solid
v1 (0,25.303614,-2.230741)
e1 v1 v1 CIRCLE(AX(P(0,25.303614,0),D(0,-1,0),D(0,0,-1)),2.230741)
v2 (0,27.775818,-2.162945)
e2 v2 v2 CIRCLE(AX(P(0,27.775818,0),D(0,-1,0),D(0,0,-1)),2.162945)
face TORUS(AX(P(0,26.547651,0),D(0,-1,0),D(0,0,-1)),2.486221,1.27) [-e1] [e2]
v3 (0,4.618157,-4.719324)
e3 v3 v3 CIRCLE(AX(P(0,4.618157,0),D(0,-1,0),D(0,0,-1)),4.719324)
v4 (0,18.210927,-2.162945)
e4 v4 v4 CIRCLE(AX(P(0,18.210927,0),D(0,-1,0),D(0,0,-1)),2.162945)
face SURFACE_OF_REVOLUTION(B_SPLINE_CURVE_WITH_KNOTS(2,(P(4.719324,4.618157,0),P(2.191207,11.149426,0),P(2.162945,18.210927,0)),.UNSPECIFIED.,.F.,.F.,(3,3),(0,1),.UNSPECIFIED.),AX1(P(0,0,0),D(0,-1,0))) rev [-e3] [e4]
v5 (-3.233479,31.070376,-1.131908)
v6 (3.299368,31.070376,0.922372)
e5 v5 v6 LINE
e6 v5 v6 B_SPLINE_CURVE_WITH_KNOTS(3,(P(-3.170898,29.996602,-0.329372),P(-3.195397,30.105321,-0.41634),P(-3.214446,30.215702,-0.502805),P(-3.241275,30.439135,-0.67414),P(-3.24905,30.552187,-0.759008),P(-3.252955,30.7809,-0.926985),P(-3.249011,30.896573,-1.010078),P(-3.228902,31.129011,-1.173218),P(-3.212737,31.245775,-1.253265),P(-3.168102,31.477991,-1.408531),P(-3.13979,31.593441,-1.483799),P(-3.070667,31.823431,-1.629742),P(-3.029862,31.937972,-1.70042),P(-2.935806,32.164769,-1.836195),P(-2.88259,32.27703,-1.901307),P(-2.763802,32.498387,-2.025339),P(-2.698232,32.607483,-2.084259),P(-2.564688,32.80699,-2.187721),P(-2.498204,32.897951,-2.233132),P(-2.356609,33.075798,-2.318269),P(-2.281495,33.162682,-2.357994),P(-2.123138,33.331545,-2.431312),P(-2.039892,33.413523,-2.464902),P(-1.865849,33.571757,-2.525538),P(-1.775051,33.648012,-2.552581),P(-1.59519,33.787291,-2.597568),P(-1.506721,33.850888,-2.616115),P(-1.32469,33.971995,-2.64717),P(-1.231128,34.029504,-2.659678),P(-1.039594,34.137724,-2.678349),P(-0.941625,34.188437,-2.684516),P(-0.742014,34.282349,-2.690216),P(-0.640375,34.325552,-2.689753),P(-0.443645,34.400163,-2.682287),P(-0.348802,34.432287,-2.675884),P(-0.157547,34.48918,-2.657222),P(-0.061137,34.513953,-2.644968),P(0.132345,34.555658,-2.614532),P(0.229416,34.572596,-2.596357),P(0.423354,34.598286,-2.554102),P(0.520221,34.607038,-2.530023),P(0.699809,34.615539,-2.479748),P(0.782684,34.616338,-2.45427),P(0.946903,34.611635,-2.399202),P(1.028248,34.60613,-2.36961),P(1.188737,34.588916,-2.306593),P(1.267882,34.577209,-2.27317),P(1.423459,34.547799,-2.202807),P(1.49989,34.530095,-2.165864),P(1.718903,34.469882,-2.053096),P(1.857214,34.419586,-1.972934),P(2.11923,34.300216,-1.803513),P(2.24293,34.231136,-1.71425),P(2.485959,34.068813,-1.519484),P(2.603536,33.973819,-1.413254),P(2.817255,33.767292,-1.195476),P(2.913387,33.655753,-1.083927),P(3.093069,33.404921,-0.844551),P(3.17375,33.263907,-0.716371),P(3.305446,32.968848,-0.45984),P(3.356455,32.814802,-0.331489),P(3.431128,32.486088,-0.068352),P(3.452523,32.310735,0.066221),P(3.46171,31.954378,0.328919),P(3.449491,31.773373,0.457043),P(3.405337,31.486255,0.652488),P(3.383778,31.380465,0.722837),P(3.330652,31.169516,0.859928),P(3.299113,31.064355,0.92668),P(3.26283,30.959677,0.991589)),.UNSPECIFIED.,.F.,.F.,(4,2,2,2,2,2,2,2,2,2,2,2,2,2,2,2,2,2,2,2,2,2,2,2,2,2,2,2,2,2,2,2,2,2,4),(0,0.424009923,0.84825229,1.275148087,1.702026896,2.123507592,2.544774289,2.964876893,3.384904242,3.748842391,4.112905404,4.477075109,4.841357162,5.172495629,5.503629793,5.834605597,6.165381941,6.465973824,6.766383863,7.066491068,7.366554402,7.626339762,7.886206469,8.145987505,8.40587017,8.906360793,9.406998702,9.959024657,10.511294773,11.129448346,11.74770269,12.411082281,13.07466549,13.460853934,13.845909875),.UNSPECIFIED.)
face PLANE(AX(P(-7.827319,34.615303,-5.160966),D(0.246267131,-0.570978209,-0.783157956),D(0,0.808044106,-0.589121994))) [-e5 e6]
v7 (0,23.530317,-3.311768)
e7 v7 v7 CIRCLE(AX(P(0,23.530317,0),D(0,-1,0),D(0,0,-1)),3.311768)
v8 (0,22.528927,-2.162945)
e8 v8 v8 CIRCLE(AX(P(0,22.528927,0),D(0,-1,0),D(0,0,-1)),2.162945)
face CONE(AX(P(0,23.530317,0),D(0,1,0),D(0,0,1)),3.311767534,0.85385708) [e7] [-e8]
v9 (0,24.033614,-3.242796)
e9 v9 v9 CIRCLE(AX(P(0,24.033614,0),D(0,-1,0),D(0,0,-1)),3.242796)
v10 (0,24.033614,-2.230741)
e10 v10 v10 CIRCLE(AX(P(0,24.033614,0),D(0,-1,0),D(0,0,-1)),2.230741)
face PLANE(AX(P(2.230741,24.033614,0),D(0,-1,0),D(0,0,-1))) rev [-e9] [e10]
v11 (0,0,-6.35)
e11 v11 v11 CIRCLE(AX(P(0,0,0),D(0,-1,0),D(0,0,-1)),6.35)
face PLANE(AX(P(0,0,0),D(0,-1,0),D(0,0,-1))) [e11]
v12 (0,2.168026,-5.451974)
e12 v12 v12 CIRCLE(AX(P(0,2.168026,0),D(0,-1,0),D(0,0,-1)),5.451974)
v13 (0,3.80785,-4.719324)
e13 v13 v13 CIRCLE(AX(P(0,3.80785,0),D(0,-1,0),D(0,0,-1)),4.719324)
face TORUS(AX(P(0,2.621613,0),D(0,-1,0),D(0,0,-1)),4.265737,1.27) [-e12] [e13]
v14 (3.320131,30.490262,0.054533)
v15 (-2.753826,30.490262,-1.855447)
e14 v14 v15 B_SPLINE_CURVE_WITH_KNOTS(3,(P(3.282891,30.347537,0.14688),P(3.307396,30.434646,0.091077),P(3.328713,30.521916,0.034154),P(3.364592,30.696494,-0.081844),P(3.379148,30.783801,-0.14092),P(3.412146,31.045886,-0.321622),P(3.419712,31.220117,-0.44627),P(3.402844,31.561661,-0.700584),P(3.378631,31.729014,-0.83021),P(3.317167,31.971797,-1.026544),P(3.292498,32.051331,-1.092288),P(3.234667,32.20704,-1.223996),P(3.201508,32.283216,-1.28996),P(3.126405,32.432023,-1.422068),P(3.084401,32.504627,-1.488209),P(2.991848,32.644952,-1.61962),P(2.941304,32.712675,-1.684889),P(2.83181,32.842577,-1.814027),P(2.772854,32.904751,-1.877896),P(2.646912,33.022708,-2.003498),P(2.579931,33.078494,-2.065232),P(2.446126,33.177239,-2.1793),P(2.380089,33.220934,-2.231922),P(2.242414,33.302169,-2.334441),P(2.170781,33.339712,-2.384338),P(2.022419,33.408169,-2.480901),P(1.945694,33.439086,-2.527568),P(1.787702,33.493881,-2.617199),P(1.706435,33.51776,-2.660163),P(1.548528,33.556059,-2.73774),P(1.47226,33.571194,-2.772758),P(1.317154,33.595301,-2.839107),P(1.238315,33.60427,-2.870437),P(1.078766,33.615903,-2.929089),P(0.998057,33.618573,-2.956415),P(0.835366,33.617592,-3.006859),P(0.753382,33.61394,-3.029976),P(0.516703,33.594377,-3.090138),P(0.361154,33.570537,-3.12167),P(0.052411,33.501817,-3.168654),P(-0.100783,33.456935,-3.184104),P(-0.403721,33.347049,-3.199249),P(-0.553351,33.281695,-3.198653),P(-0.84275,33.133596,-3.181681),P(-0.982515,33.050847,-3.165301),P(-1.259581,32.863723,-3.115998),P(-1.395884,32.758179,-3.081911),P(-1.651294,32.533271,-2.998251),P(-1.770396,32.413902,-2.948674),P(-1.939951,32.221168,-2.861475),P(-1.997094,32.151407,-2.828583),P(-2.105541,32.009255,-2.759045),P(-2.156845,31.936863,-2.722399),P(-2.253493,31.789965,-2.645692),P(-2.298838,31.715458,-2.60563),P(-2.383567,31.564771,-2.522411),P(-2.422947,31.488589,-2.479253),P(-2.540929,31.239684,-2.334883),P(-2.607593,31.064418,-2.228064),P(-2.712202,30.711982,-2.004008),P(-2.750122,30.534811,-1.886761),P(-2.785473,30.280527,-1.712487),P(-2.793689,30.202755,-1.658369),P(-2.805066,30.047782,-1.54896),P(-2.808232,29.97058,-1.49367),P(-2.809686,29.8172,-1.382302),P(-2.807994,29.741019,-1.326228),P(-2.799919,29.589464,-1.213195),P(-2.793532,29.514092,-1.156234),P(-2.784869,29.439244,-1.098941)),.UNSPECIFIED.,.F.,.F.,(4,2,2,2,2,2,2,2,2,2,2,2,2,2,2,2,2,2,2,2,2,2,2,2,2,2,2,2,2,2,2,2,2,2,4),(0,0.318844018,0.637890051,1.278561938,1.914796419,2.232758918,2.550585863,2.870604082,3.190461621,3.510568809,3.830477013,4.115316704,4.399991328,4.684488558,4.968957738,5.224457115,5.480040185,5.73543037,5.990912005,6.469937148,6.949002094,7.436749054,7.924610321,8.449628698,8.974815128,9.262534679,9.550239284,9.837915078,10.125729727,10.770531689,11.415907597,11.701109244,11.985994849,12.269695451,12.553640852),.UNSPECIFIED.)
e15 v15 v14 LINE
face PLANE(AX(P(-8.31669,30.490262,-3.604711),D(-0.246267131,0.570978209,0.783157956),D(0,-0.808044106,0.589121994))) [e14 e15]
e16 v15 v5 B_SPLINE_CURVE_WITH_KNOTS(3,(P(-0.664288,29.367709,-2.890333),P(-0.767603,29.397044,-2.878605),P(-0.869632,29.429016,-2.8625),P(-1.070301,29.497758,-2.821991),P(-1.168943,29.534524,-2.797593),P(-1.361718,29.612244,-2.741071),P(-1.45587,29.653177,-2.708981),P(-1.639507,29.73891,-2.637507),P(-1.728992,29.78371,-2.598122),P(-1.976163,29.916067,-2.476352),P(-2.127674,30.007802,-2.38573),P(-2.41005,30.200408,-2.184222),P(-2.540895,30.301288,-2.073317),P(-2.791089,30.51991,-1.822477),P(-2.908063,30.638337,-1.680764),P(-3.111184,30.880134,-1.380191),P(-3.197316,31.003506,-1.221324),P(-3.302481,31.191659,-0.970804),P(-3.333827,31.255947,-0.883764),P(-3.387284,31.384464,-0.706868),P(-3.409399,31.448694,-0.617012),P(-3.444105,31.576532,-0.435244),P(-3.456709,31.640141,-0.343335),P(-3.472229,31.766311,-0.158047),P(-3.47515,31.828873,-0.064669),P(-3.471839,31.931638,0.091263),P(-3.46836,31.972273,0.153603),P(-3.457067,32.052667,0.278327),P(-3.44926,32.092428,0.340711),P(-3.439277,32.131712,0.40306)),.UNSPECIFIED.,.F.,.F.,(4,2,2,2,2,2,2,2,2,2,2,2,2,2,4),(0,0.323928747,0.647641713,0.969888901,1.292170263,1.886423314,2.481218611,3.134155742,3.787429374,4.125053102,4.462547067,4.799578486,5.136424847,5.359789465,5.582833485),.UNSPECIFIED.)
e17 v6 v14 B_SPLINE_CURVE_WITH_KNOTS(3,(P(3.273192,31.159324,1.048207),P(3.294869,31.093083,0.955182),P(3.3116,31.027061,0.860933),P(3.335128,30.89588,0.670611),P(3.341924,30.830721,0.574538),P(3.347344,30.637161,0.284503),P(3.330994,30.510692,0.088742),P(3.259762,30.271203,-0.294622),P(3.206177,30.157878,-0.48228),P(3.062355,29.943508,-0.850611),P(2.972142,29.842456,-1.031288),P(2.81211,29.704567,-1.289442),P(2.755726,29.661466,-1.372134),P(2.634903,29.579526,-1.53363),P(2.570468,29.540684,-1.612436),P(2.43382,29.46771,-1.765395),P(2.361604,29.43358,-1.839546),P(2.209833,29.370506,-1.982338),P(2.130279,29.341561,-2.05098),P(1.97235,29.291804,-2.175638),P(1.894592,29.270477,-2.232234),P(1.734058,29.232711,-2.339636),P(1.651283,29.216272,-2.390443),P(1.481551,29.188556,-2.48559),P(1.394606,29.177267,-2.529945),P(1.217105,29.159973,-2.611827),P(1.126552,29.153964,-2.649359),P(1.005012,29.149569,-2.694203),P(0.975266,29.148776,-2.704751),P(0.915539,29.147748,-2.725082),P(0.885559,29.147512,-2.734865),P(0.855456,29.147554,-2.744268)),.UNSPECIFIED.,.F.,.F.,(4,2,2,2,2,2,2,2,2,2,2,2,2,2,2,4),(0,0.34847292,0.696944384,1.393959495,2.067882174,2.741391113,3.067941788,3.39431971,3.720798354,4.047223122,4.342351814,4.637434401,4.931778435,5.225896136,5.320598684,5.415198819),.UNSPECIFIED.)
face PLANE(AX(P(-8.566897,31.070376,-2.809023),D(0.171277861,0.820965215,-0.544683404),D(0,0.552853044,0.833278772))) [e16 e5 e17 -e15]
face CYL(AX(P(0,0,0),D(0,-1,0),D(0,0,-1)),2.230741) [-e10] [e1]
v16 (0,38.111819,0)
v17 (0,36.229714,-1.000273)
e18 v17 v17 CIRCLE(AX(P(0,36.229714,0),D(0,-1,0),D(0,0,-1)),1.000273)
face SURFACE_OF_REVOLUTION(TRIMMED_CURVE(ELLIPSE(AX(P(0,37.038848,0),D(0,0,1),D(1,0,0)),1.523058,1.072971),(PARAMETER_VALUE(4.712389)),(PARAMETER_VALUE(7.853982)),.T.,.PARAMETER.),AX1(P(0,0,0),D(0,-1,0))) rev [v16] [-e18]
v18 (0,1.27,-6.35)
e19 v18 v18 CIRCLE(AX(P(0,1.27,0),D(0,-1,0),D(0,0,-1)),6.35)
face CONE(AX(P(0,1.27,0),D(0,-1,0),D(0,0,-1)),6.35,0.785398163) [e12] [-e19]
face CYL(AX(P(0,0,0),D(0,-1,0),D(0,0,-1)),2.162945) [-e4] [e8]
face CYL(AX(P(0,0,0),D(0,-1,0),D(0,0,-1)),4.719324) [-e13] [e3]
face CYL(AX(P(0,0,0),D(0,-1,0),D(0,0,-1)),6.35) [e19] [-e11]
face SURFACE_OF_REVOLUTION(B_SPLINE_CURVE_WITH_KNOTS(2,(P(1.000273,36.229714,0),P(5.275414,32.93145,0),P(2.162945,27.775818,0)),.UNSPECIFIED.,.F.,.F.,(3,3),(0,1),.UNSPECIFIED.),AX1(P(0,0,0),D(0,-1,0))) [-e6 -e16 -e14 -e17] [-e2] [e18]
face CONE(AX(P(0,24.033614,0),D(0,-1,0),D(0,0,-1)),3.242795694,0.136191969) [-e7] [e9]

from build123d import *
from OCP.BRepAlgoAPI import BRepAlgoAPI_Cut
from OCP.TopTools import TopTools_ListOfShape

# Parameters (mm, degrees)
CUT_EXTRUDE1_DEPTH      = 5.842
CUT_EXTRUDE1_DEPTH_BACK = 7.112


with BuildPart() as part:
    # Sketch1 → Revolve1 (revolve)
    with BuildSketch(Plane.XY):
        with BuildLine():
            Line((0, 0), (6.35, 0))
            Line((6.35, 0), (6.35, 1.27))
            Line((6.35, 1.27), (5.451974388, 2.168025612))
            ThreePointArc((5.451974388, 2.168025612), (5.425268168, 3.139674583), (4.719324443, 3.807850011))
            Line((4.719324443, 3.807850011), (4.719324443, 4.618157389))
            add(Edge.make_bspline(
                [(4.719324443, 4.618157389), (2.191207341, 11.149425628), (2.162945217, 18.210926818)],
                knots=[0, 0, 0, 1, 1, 1], degree=2))
            Line((2.162945217, 18.210926818), (2.162945217, 22.528926818))
            Line((2.162945217, 22.528926818), (3.311767534, 23.530317493))
            Line((3.311767534, 23.530317493), (3.242795694, 24.033613514))
            Line((3.242795694, 24.033613514), (2.230740911, 24.033613514))
            Line((2.230740911, 24.033613514), (2.230740911, 25.303613514))
            ThreePointArc((2.230740911, 25.303613514), (3.755743451, 26.582465667), (2.162945217, 27.77581782))
            add(Edge.make_bspline(
                [(1.000273268, 36.229714038), (5.275414498, 32.931450332), (2.162945217, 27.77581782)],
                knots=[0, 0, 0, 1, 1, 1], degree=2))
            add(Edge.make_bspline(
                [(1.000273268, 36.229714038), (4.067898527, 38.111819372), (0, 38.111819372)],
                knots=[5.428894031, 5.428894031, 5.428894031, 7.853981634, 7.853981634, 7.853981634], degree=2, weights=[1, 0.35063824, 1]))
            Line((0, 38.111819372), (0, 38.1))
            Line((0, 38.1), (0, 0))
        make_face()
    revolve(axis=Axis((0, 0, 0), (0, 1, 0)))


with BuildPart() as cut_extrude1_tool:
    # Sketch3 → Cut-Extrude1 (new, two sides: drawn at the far end of the back side and taken through both)
    with BuildSketch(Plane(origin=(-3.227609174, 24.033613514, -0.313469186), x_dir=(-0.29997267443447917, 0, 0.9539477944796696), z_dir=(-0.9539477944796697, 0, -0.29997267443447917)).offset(-CUT_EXTRUDE1_DEPTH_BACK)):
        with BuildLine():
            Line((-3.24447126, 10.581689828), (-0.778987351, 7.036762029))
            Line((-0.778987351, 7.036762029), (-1.61308801, 6.456648169))
            Line((-1.61308801, 6.456648169), (-3.788514988, 9.584525638))
            ThreePointArc((-3.788514988, 9.584525638), (-3.824633805, 10.251226491), (-3.24447126, 10.581689828))
        make_face()
    extrude(amount=CUT_EXTRUDE1_DEPTH + CUT_EXTRUDE1_DEPTH_BACK)


with BuildPart() as part_1:
    add(part.part)

    # Cut-Extrude1: cut by cut_extrude1_tool, with a tolerance
    cut_extrude1_stock = TopTools_ListOfShape()
    cut_extrude1_stock.Append(part_1.part.wrapped)
    cut_extrude1_tools = TopTools_ListOfShape()
    cut_extrude1_tools.Append(cut_extrude1_tool.part.wrapped)
    cut_extrude1_cut = BRepAlgoAPI_Cut()
    cut_extrude1_cut.SetArguments(cut_extrude1_stock)
    cut_extrude1_cut.SetTools(cut_extrude1_tools)
    cut_extrude1_cut.SetFuzzyValue(0.00001)
    cut_extrude1_cut.Build()
    add(Compound.cast(cut_extrude1_cut.Shape()).solids(), mode=Mode.REPLACE)


solid = part_1.part
